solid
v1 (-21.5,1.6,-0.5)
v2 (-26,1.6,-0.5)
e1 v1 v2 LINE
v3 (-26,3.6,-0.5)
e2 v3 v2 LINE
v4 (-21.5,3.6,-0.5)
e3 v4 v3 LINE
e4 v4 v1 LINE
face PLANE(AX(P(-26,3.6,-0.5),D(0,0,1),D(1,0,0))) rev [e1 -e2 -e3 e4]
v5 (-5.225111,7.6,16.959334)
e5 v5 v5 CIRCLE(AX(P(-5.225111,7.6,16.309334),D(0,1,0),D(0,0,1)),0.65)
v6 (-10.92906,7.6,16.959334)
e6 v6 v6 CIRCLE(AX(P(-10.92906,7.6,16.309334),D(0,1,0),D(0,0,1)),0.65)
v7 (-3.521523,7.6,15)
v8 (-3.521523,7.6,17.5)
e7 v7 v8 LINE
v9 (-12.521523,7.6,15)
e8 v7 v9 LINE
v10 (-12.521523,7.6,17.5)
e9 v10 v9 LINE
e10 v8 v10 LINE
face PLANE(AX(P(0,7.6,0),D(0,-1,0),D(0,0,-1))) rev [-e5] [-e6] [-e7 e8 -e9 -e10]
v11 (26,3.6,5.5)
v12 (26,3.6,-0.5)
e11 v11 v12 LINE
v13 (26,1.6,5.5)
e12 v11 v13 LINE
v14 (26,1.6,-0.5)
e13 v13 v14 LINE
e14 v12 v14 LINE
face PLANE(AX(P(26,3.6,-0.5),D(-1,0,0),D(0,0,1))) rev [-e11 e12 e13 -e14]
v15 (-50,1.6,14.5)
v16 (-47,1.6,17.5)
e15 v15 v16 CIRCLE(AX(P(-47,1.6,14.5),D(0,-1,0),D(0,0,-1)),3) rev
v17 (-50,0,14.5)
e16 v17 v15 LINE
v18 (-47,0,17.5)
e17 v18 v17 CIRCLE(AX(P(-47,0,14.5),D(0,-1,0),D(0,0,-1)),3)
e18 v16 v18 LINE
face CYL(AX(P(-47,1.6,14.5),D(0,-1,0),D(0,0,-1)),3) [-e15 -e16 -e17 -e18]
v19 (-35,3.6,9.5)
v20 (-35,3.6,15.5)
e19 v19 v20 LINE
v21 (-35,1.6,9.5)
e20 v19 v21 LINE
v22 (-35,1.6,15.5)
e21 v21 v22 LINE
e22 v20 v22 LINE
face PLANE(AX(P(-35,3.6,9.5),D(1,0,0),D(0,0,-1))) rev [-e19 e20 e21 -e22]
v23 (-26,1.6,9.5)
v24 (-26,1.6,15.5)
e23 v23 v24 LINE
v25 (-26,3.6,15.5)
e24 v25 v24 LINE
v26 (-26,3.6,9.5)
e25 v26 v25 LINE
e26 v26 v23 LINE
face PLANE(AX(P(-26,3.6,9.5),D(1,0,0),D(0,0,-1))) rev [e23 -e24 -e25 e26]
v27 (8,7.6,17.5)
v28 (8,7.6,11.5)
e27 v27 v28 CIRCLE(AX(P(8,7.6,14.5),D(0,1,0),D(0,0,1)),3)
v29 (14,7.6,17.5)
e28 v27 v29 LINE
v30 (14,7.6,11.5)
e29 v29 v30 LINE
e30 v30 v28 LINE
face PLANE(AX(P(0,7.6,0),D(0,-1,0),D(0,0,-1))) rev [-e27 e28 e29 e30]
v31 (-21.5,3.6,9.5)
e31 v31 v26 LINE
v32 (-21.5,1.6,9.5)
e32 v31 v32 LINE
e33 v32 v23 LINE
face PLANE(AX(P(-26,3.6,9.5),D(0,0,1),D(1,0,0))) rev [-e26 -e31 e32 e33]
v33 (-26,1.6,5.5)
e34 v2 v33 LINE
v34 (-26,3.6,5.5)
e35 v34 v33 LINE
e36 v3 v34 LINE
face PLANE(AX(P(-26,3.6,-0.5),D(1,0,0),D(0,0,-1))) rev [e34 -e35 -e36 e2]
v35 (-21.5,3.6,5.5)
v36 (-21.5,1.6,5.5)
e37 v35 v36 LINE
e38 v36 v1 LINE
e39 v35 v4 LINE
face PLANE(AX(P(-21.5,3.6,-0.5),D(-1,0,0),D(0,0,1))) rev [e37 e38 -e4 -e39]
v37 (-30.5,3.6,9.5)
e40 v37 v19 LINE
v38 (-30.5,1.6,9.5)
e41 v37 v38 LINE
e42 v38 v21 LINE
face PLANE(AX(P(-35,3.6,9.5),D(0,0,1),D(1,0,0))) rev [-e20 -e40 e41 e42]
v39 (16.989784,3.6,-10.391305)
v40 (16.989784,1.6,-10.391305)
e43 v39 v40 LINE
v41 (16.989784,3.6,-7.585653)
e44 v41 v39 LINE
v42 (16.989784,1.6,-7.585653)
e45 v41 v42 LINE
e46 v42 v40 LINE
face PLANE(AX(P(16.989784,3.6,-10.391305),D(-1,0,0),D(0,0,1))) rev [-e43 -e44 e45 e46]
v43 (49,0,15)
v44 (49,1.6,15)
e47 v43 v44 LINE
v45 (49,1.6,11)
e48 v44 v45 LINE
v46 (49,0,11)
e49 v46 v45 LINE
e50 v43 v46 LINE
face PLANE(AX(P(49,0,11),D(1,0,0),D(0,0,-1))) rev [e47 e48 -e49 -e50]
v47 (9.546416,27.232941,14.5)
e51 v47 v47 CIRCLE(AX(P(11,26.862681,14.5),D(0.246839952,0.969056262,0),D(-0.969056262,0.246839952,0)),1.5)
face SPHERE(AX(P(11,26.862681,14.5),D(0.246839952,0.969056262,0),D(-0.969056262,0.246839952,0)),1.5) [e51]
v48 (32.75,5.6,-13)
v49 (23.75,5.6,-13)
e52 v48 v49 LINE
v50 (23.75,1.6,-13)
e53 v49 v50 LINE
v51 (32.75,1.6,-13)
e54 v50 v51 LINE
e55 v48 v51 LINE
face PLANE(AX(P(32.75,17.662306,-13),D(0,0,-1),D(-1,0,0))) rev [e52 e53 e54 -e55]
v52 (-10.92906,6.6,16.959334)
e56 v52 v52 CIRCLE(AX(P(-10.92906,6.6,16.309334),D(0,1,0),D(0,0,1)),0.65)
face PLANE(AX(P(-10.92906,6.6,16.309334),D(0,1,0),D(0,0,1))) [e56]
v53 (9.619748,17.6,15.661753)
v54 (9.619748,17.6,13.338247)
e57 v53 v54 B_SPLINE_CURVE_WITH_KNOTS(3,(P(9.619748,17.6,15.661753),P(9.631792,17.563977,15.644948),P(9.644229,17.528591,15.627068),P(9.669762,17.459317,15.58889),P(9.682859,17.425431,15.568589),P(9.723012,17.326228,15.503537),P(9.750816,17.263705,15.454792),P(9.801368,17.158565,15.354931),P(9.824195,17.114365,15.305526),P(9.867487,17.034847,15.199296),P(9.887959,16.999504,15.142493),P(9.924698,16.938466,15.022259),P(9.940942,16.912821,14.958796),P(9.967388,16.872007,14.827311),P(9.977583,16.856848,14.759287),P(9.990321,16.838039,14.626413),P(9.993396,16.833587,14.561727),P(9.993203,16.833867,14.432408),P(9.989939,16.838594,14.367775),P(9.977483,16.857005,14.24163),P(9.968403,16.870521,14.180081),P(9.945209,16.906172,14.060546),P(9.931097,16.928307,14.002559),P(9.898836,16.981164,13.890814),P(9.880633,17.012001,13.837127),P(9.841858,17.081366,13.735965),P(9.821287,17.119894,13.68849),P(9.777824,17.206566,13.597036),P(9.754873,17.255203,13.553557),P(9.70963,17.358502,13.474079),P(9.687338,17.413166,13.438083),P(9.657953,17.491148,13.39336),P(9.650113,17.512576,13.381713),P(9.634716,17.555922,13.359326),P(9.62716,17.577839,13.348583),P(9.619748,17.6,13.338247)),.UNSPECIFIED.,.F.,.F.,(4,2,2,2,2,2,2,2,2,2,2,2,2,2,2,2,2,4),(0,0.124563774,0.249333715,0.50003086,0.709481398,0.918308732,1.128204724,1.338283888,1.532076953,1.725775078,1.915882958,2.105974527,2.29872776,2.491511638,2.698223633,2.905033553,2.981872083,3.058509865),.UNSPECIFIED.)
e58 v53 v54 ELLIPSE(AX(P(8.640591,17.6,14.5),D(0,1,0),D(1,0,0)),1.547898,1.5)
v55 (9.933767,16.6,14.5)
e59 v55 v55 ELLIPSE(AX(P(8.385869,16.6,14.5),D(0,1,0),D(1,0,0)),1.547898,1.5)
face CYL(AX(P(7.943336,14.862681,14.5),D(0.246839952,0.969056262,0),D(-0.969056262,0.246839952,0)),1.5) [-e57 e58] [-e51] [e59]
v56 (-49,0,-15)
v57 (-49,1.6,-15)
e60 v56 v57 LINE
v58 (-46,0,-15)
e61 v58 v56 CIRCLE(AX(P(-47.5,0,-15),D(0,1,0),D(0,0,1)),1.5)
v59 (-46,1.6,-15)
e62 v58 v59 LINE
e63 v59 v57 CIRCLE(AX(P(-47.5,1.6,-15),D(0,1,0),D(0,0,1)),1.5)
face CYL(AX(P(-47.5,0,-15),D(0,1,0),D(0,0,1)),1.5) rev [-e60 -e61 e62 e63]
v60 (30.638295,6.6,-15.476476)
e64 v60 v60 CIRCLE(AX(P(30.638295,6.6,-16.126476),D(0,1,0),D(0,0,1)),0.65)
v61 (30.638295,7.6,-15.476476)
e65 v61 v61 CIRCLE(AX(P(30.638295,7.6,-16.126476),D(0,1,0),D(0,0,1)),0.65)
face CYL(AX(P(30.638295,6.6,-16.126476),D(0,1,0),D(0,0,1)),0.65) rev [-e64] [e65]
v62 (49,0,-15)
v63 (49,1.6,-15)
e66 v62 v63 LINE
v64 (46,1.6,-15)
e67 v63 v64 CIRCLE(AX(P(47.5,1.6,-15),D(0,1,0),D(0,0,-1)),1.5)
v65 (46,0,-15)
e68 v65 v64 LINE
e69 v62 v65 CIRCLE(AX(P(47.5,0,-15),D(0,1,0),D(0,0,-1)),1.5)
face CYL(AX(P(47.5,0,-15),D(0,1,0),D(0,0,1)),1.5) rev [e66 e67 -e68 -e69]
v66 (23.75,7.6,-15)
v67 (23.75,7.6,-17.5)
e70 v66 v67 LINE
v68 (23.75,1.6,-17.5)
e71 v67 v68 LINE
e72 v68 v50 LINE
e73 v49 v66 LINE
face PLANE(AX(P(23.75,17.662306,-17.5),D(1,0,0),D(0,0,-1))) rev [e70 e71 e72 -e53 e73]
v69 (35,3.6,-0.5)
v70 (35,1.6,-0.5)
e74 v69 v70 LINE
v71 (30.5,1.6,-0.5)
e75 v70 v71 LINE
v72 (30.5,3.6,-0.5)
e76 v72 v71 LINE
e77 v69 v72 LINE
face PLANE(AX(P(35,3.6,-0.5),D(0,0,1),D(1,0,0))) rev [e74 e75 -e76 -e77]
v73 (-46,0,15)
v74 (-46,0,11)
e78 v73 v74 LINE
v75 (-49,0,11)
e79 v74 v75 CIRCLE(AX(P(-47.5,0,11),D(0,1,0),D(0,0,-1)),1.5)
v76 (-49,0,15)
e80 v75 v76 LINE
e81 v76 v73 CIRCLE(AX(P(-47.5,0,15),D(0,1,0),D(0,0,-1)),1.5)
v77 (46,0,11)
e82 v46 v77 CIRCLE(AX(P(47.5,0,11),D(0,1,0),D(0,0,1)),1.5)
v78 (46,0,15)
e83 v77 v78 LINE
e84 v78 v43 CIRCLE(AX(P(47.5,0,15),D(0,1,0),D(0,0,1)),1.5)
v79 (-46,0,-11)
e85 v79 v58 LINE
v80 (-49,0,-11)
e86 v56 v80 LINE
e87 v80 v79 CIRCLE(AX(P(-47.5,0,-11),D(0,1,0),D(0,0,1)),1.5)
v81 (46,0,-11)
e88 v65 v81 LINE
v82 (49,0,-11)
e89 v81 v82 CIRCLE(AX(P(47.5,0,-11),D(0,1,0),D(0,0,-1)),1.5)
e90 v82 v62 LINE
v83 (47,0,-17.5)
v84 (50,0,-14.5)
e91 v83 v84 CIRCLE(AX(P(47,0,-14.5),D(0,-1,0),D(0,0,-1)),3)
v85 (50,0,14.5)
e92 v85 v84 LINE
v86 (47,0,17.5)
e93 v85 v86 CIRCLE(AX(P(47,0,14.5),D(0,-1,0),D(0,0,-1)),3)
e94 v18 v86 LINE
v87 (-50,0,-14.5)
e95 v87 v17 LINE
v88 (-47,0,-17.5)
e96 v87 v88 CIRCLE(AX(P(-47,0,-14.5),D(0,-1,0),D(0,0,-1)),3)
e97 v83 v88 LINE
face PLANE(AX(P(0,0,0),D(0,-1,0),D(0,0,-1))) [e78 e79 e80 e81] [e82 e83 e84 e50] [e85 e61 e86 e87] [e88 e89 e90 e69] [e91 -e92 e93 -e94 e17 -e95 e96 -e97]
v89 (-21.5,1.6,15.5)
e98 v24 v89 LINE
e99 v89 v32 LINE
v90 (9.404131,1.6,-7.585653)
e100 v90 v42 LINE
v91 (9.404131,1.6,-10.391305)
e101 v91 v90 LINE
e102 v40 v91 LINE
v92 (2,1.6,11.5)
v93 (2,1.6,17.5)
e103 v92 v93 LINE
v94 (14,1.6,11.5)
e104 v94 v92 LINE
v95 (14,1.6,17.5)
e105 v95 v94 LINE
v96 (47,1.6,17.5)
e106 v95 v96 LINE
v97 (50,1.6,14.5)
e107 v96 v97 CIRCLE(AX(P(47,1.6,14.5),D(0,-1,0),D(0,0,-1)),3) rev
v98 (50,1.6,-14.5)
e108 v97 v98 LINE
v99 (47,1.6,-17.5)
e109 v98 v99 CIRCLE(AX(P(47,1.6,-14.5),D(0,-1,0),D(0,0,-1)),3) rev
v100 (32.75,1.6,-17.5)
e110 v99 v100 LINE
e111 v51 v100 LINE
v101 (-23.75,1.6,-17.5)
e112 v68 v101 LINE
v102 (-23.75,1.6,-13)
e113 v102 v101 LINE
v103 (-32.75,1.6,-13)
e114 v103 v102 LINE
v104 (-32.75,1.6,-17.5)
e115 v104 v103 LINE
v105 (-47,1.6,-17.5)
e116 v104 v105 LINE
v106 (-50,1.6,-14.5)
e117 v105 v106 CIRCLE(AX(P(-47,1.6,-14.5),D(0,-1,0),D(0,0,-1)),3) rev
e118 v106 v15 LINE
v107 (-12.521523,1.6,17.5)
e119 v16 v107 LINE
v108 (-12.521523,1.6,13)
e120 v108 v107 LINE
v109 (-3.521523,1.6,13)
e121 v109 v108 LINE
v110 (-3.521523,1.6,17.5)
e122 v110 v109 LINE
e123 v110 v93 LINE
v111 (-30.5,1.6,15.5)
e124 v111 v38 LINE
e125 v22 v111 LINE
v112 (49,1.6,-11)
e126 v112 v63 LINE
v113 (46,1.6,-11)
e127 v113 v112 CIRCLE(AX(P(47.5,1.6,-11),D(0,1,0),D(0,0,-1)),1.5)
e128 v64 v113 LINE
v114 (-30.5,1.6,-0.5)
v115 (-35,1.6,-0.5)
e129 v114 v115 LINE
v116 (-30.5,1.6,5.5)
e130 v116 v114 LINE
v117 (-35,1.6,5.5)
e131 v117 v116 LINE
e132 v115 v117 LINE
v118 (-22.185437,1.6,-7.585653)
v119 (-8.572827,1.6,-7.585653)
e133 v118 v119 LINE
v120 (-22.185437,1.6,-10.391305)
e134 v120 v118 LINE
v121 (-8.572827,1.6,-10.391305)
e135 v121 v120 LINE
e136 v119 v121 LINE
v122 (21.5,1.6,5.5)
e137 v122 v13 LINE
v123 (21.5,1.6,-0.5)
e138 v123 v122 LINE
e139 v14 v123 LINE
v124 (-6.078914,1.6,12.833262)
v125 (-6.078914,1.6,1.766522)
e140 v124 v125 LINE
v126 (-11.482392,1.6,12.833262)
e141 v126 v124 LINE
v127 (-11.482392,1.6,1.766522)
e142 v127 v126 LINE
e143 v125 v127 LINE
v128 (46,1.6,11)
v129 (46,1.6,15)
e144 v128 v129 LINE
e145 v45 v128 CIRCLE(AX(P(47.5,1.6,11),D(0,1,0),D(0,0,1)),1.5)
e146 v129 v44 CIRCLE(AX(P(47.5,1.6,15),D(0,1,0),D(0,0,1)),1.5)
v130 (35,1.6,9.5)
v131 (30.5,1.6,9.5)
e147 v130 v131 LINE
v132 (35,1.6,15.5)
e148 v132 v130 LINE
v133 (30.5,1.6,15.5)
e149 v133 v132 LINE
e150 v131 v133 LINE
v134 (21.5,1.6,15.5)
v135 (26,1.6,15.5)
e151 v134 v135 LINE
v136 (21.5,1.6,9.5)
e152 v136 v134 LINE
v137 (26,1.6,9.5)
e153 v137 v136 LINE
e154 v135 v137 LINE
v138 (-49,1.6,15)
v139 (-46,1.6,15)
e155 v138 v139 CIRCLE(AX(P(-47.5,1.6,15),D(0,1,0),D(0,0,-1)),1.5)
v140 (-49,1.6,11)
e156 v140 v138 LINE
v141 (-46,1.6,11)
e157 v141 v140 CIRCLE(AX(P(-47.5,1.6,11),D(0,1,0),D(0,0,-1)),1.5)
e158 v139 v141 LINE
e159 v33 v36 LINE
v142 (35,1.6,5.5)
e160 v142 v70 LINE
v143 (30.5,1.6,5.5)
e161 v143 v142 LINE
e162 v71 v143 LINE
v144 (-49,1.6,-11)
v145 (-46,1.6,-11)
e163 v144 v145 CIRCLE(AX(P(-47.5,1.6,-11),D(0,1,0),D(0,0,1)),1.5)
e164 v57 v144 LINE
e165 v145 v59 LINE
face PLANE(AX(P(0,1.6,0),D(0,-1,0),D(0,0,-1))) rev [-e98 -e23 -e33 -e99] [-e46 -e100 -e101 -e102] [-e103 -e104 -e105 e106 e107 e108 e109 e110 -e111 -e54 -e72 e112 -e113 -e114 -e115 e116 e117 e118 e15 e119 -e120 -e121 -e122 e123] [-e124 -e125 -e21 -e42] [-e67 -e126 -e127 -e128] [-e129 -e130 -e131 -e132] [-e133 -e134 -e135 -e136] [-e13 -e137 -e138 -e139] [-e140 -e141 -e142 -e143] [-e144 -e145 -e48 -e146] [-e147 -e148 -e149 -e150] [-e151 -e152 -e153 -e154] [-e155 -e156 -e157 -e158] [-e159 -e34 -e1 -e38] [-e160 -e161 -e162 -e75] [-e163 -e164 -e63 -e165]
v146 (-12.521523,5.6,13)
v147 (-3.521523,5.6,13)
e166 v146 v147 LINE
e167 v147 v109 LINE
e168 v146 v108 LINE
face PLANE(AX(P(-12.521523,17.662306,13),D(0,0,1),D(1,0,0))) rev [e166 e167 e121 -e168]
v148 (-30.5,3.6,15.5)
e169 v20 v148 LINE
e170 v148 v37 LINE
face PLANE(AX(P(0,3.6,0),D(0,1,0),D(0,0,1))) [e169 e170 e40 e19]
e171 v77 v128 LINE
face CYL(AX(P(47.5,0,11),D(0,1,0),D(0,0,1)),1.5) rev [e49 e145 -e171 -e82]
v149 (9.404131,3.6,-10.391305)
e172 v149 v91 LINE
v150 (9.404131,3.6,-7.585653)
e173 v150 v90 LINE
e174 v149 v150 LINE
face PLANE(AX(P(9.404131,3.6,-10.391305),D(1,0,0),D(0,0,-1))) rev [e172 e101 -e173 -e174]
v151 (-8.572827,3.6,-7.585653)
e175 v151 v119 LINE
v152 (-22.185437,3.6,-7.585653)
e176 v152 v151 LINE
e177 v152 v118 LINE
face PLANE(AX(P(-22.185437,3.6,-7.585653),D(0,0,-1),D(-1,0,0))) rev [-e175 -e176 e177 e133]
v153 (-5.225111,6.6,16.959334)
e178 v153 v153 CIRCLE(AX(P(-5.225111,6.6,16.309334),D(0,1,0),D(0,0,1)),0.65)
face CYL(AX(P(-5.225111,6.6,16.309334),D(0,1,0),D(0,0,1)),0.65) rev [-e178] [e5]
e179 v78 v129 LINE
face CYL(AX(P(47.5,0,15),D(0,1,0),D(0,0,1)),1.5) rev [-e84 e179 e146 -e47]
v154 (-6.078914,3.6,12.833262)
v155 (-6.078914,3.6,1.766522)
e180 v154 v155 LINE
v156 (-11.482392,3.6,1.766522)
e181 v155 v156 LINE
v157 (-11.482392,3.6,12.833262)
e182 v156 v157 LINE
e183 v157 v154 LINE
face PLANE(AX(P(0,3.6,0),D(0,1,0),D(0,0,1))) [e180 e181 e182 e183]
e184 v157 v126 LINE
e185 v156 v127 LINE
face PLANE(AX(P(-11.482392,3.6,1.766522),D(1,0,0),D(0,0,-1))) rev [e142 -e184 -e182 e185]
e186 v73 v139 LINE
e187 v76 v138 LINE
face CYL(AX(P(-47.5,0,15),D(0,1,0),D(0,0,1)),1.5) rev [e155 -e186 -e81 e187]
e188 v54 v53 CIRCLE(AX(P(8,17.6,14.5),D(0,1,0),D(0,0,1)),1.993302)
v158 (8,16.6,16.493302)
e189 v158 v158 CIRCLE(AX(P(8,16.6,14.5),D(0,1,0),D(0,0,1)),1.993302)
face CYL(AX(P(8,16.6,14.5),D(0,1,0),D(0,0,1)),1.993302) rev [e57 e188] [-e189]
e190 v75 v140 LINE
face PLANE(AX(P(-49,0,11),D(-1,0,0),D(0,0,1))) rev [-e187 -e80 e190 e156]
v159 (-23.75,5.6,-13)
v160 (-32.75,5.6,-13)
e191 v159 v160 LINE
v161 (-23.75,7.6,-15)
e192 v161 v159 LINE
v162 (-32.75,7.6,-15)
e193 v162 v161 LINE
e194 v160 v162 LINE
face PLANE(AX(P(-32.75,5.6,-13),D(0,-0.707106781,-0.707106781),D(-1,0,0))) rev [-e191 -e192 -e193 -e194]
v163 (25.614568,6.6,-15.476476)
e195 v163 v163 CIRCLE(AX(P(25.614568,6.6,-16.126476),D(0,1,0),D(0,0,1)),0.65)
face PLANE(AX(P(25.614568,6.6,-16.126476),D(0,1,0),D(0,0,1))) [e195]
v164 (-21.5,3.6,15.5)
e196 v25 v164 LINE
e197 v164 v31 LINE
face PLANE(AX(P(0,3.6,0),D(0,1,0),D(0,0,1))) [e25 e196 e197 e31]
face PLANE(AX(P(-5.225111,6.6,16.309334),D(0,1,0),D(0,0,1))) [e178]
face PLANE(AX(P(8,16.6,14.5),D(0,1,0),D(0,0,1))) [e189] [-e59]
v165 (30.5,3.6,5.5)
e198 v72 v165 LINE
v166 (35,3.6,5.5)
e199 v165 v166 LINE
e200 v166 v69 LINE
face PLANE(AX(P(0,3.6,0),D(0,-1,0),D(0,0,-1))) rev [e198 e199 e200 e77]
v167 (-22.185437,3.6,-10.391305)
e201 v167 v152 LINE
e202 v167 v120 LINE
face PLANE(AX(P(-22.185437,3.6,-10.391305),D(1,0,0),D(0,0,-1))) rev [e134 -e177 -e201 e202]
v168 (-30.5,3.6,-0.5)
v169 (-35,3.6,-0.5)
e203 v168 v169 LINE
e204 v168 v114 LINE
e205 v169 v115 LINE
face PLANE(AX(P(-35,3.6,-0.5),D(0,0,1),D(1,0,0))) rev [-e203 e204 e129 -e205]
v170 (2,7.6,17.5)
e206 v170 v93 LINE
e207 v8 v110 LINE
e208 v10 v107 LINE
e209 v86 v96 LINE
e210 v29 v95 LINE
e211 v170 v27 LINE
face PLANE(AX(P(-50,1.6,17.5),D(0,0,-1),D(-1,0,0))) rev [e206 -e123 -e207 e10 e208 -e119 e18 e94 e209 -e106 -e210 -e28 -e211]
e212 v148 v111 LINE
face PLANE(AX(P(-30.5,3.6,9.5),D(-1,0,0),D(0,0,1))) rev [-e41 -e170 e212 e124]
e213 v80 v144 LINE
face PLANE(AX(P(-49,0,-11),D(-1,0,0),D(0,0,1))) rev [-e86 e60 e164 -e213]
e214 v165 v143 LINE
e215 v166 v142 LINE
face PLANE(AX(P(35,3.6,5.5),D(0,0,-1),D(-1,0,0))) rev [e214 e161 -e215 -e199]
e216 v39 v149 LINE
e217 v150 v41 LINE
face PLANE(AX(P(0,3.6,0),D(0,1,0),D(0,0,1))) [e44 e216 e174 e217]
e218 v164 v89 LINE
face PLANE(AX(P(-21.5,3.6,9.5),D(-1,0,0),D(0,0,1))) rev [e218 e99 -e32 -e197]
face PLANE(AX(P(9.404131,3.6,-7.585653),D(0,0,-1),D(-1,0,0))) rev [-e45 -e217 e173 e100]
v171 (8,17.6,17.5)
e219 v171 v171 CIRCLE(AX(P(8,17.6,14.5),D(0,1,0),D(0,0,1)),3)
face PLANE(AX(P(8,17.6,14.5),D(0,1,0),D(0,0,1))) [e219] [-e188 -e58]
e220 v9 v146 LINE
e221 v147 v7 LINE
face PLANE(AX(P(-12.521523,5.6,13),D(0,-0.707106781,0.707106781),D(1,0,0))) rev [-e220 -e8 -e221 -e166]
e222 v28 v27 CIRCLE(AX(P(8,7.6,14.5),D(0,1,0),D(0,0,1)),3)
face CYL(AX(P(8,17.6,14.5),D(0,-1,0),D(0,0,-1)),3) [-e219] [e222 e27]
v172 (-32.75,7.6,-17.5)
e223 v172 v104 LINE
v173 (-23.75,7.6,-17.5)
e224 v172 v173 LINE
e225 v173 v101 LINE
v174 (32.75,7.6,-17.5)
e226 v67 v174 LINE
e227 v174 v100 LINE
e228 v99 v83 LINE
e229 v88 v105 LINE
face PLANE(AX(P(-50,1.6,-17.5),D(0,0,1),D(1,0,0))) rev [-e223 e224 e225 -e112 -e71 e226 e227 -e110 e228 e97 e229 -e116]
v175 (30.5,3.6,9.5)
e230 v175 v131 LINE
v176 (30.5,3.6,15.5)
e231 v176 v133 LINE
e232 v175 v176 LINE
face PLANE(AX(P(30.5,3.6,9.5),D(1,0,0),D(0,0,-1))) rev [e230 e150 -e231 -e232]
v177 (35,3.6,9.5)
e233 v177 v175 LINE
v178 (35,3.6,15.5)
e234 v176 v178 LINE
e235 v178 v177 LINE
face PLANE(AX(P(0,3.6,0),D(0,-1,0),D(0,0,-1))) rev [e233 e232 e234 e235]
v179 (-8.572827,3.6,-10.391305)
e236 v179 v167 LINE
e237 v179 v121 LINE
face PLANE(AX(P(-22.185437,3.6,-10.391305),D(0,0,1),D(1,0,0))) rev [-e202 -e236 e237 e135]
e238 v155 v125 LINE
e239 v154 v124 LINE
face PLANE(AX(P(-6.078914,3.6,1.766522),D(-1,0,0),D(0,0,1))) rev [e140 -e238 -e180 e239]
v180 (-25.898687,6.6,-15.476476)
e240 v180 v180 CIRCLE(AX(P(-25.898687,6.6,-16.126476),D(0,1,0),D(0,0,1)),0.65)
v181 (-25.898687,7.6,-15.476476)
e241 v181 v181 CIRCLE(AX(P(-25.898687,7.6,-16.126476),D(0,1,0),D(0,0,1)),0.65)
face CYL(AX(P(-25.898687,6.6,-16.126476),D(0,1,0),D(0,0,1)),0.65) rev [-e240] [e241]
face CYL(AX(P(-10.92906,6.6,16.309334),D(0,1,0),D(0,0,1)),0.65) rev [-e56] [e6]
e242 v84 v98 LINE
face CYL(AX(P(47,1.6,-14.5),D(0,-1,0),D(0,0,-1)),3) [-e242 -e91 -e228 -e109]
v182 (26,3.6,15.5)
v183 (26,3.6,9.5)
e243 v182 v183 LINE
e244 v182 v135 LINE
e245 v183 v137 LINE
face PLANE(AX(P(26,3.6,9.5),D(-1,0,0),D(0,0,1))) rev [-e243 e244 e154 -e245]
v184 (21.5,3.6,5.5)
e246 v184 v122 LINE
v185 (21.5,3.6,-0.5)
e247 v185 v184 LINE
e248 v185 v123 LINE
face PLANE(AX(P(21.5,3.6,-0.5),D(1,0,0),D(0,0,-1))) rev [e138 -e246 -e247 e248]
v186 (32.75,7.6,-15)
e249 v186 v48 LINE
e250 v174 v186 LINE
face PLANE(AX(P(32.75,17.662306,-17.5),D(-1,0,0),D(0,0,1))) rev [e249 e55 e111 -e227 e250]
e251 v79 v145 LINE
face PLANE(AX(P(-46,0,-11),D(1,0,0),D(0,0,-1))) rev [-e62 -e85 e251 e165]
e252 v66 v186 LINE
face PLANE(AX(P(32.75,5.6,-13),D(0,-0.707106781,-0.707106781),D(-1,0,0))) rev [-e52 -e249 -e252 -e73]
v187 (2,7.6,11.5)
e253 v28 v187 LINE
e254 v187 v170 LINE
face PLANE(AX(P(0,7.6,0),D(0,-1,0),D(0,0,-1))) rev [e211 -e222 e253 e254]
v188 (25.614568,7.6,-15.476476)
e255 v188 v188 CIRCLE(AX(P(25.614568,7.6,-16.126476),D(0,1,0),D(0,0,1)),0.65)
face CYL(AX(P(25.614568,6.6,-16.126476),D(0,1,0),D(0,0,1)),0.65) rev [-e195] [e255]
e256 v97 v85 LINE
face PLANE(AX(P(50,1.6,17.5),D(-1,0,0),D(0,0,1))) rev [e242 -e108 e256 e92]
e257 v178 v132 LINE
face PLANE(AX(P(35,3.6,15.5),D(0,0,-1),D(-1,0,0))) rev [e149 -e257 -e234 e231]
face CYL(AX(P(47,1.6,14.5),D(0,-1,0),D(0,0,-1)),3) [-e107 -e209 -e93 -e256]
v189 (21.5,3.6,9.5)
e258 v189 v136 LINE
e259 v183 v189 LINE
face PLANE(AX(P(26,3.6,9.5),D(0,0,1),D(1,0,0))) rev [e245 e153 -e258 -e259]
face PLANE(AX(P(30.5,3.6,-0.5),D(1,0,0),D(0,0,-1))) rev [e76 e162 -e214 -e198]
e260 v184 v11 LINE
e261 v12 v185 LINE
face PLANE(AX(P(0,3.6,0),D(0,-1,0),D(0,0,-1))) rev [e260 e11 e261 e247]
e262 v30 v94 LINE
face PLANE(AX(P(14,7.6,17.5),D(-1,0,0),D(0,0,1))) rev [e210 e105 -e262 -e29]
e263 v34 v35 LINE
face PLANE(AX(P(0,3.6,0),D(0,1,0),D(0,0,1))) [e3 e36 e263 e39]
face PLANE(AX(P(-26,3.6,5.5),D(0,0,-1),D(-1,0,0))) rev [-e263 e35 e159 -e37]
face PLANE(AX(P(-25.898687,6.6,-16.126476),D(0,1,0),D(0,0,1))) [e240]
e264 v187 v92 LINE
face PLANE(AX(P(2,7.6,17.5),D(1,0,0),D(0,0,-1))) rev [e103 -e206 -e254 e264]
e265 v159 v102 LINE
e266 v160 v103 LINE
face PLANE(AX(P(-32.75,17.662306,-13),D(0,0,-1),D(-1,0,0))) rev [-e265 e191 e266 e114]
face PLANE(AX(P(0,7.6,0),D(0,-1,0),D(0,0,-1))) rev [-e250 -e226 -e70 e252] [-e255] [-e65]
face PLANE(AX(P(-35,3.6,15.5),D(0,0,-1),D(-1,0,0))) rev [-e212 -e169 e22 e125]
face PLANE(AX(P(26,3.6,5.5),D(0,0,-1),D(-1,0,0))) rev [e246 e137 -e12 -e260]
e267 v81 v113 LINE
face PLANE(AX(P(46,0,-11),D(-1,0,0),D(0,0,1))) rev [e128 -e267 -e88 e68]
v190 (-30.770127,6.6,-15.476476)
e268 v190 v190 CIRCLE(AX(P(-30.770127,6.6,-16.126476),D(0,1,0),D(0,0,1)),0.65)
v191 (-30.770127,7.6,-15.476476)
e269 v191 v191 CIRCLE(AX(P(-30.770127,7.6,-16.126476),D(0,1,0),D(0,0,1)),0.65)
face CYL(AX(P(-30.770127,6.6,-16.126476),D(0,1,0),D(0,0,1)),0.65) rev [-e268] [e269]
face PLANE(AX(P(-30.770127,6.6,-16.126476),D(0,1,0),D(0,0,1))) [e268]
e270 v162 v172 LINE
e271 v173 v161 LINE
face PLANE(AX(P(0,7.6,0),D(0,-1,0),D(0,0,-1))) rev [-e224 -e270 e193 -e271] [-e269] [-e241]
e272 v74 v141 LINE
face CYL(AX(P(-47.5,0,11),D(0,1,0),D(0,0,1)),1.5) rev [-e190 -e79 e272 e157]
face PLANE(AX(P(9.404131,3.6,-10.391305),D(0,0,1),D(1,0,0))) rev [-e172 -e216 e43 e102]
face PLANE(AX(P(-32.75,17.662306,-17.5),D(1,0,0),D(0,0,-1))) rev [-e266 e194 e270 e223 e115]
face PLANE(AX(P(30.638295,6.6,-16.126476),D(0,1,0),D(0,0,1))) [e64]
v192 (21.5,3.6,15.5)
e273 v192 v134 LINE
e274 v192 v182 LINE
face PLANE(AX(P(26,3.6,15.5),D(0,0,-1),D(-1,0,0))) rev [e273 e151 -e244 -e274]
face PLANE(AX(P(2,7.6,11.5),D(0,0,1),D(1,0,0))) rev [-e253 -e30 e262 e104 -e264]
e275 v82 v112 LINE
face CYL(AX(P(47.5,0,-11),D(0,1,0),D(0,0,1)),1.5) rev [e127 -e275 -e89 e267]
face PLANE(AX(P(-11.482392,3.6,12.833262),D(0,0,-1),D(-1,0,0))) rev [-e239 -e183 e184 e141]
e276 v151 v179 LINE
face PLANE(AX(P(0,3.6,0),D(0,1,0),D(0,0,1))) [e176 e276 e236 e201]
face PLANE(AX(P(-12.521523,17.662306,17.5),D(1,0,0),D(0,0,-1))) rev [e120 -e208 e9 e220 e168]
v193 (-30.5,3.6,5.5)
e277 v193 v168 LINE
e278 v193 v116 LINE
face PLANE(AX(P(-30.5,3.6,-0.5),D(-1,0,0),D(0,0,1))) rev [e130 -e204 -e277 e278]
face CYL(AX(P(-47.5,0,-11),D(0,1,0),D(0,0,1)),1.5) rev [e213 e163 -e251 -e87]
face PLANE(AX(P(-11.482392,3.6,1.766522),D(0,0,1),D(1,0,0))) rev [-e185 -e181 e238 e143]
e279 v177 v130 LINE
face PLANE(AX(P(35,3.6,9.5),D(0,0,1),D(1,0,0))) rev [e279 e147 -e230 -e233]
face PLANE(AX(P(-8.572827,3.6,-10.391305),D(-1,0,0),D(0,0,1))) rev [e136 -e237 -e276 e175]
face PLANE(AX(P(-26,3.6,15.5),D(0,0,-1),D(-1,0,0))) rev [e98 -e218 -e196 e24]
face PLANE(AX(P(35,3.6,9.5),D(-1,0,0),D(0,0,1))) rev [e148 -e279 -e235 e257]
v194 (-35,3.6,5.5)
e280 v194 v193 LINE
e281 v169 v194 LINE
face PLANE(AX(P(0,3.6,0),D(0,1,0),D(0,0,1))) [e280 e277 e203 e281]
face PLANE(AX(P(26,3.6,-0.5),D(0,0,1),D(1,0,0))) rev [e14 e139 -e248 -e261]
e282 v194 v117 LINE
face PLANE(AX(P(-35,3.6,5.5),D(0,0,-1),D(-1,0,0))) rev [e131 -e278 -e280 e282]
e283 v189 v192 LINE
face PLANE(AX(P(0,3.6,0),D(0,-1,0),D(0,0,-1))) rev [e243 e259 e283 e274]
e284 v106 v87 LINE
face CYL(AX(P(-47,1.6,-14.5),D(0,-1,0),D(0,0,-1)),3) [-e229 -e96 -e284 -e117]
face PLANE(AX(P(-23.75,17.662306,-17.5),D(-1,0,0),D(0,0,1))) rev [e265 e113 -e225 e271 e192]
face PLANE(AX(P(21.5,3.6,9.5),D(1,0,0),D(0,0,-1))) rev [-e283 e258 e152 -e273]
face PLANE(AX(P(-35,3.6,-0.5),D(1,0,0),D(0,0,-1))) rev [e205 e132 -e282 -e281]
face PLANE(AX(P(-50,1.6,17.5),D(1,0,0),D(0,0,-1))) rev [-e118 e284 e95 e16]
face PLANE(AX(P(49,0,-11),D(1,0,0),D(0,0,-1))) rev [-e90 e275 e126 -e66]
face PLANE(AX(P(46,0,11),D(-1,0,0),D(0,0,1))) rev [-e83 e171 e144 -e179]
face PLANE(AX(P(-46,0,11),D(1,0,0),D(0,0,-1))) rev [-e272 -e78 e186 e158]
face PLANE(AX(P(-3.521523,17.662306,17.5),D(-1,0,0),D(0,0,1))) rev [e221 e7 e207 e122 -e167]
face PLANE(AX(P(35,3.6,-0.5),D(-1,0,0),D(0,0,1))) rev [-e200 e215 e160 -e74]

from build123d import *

# Parameters (mm, degrees)
SKETCH_1_W          = 100
SKETCH_1_H          = 35
EXTRUDE_1_DEPTH     = 1.6
CUT_EXTRUDE_1_DEPTH = 53.998207517
FILLET_1_R          = 3
SKETCH_3_W          = 12
SKETCH_3_H          = 6
EXTRUDE_2_DEPTH     = 6
SKETCH_4_R          = 3
EXTRUDE_3_DEPTH     = 10
SKETCH_5_W          = 4.5
SKETCH_5_H          = 6
SKETCH_5_W_2        = 5.403478788
SKETCH_5_H_2        = 11.06674021
EXTRUDE_4_DEPTH     = 2
SKETCH_6_W          = 7.585652914
SKETCH_6_H          = 2.805652448
SKETCH_6_W_2        = 13.612610022
EXTRUDE_5_DEPTH     = 2
SKETCH_7_W          = 9
SKETCH_7_H          = 4.5
EXTRUDE_6_DEPTH     = 6
CHAMFER_1_SIZE      = 2
SKETCH_9_R          = 0.65
CUT_EXTRUDE_2_DEPTH = 1
SWEEP_1_PROFILE_R   = 1.5
SKETCH_27_R         = 1.993301653
CUT_EXTRUDE_3_DEPTH = 1


with BuildPart() as part:
    # 草图1 → 凸台-拉伸1 (new body)
    with BuildSketch(Plane(origin=(0, 0, 0), x_dir=(1, 0, 0), z_dir=(0, 1, 0))):
        Rectangle(SKETCH_1_W, SKETCH_1_H)
    extrude(amount=EXTRUDE_1_DEPTH)

    # 草图2 → 切除-拉伸1 (cut, through all)
    with BuildSketch(Plane(origin=(0, 1.6, 0), x_dir=(1, 0, 0), z_dir=(0, 1, 0))):
        with BuildLine():
            Line((-49, 11), (-49, 15))
            ThreePointArc((-49, 15), (-47.5, 16.5), (-46, 15))
            Line((-46, 15), (-46, 11))
            ThreePointArc((-46, 11), (-47.5, 9.5), (-49, 11))
        make_face()
        with BuildLine():
            Line((49, 11), (49, 15))
            ThreePointArc((49, 15), (47.5, 16.5), (46, 15))
            Line((46, 15), (46, 11))
            ThreePointArc((46, 11), (47.5, 9.5), (49, 11))
        make_face()
        with BuildLine():
            Line((-49, -11), (-49, -15))
            ThreePointArc((-49, -15), (-47.5, -16.5), (-46, -15))
            Line((-46, -15), (-46, -11))
            ThreePointArc((-46, -11), (-47.5, -9.5), (-49, -11))
        make_face()
        with BuildLine():
            Line((49, -11), (49, -15))
            ThreePointArc((49, -15), (47.5, -16.5), (46, -15))
            Line((46, -15), (46, -11))
            ThreePointArc((46, -11), (47.5, -9.5), (49, -11))
        make_face()
    extrude(amount=-CUT_EXTRUDE_1_DEPTH, mode=Mode.SUBTRACT)

    # 圆角1
    fillet_1_edges = [part.edges().sort_by_distance(p)[0] for p in [
        (50, 0.8, 17.5),
        (-50, 0.8, 17.5),
        (-50, 0.8, -17.5),
        (50, 0.8, -17.5),
    ]]
    fillet(fillet_1_edges, radius=FILLET_1_R)

    # 草图3 → 凸台-拉伸2 (add)
    with BuildSketch(Plane(origin=(0, 1.6, 0), x_dir=(1, 0, 0), z_dir=(0, 1, 0))):
        with Locations((8, -14.5)):
            Rectangle(SKETCH_3_W, SKETCH_3_H)
    extrude(amount=EXTRUDE_2_DEPTH)

    # 草图4 → 凸台-拉伸3 (add)
    with BuildSketch(Plane(origin=(0, 7.6, 0), x_dir=(1, 0, 0), z_dir=(0, 1, 0))):
        with Locations(Location((8, -14.5, 0), (0, 0, 270))):
            Circle(SKETCH_4_R)
    extrude(amount=EXTRUDE_3_DEPTH)

    # 草图5 → 凸台-拉伸4 (add)
    with BuildSketch(Plane(origin=(0, 1.6, 0), x_dir=(1, 0, 0), z_dir=(0, 1, 0))):
        with Locations((-32.75, -2.5)):
            Rectangle(SKETCH_5_W, SKETCH_5_H)
        with Locations((-23.75, -2.5)):
            Rectangle(SKETCH_5_W, SKETCH_5_H)
        with Locations((-32.75, -12.5)):
            Rectangle(SKETCH_5_W, SKETCH_5_H)
        with Locations((-23.75, -12.5)):
            Rectangle(SKETCH_5_W, SKETCH_5_H)
        with Locations((-8.78065303, -7.299892016)):
            Rectangle(SKETCH_5_W_2, SKETCH_5_H_2)
        with Locations((23.75, -12.5)):
            Rectangle(SKETCH_5_W, SKETCH_5_H)
        with Locations((32.75, -12.5)):
            Rectangle(SKETCH_5_W, SKETCH_5_H)
        with Locations((32.75, -2.5)):
            Rectangle(SKETCH_5_W, SKETCH_5_H)
        with Locations((23.75, -2.5)):
            Rectangle(SKETCH_5_W, SKETCH_5_H)
    extrude(amount=EXTRUDE_4_DEPTH)

    # 草图6 → 凸台-拉伸5 (add)
    with BuildSketch(Plane(origin=(0, 1.6, 0), x_dir=(1, 0, 0), z_dir=(0, 1, 0))):
        with Locations((13.196957808, 8.988479137)):
            Rectangle(SKETCH_6_W, SKETCH_6_H)
        with Locations((-15.379131934, 8.988479137)):
            Rectangle(SKETCH_6_W_2, SKETCH_6_H)
    extrude(amount=EXTRUDE_5_DEPTH)

    # 草图7 → 凸台-拉伸6 (add)
    with BuildSketch(Plane(origin=(0, 1.6, 0), x_dir=(1, 0, 0), z_dir=(0, 1, 0))):
        with Locations((-28.25, 15.25)):
            Rectangle(SKETCH_7_W, SKETCH_7_H)
        with Locations((28.25, 15.25)):
            Rectangle(SKETCH_7_W, SKETCH_7_H)
        with Locations((-8.02152296, -15.25)):
            Rectangle(SKETCH_7_W, SKETCH_7_H)
    extrude(amount=EXTRUDE_6_DEPTH)

    # 倒角1
    chamfer_1_edges = [part.edges().sort_by_distance(p)[0] for p in [
        (-28.25, 7.6, -13),
        (28.25, 7.6, -13),
        (-8.02152296, 7.6, 13),
    ]]
    chamfer(chamfer_1_edges, length=CHAMFER_1_SIZE)

    # 草图9 → 切除-拉伸2 (cut)
    with BuildSketch(Plane(origin=(0, 7.6, 0), x_dir=(1, 0, 0), z_dir=(0, 1, 0))):
        with Locations(Location((-30.77012682, 16.126476079, 0), (0, 0, 270))):
            Circle(SKETCH_9_R)
        with Locations(Location((-25.898686841, 16.126476079, 0), (0, 0, 270))):
            Circle(SKETCH_9_R)
        with Locations(Location((25.614567714, 16.126476079, 0), (0, 0, 270))):
            Circle(SKETCH_9_R)
        with Locations(Location((30.638295355, 16.126476079, 0), (0, 0, 270))):
            Circle(SKETCH_9_R)
        with Locations(Location((-10.92906004, -16.309333864, 0), (0, 0, 270))):
            Circle(SKETCH_9_R)
        with Locations(Location((-5.225111254, -16.309333864, 0), (0, 0, 270))):
            Circle(SKETCH_9_R)
    extrude(amount=-CUT_EXTRUDE_2_DEPTH, mode=Mode.SUBTRACT)

    # 草图27 → 切除-拉伸3 (cut)
    with BuildSketch(Plane(origin=(0, 17.6, 0), x_dir=(1, 0, 0), z_dir=(0, 1, 0))):
        with Locations(Location((8, -14.5, 0), (0, 0, 270))):
            Circle(SKETCH_27_R)
    extrude(amount=-CUT_EXTRUDE_3_DEPTH, mode=Mode.SUBTRACT)


with BuildPart() as body_2:
    # 扫描1: sweep along a path in 草图10
    with BuildLine(Plane.XY.offset(14.5)) as sweep_1_path:
        Line((7.943335964, 14.862681463), (11, 26.862681463))
    # 扫描1 profile (on start of the path) → 扫描1 (sweep)
    with BuildSketch(Plane(origin=(7.943335964, 14.862681463, 14.5), x_dir=(0.9690562615876172, -0.24683995194828523, 0), z_dir=(0.24683995194828523, 0.9690562615876172, 0))):
        Circle(SWEEP_1_PROFILE_R)
    sweep(path=sweep_1_path.line)

    # 圆顶1: read off the stored shape, not the designer's step
    # 圆顶1 outline → 圆顶1 (revolve)
    with BuildSketch(Plane(origin=(3.904168632, -0.994477654, 14.5), x_dir=(0.9690562615876172, -0.2468399519482851, 0), z_dir=(0, 0, 1))):
        with BuildLine():
            Line((0, 28.746689146), (1.5, 28.746689145))
            ThreePointArc((1.5, 28.746689145), (1.060660172, 29.807349317), (0, 30.246689146))
            Line((0, 30.246689146), (0, 28.746689146))
        make_face()
    revolve(axis=Axis((3.904168632, -0.994477654, 14.5), (0.2468399519482851, 0.9690562615876172, 0)))


with BuildPart() as part_1:
    add(part.part)

    # 相交1: read off the stored shape, not the designer's step
    # 相交1: union body 2
    add(body_2.part)


solid = part_1.part
